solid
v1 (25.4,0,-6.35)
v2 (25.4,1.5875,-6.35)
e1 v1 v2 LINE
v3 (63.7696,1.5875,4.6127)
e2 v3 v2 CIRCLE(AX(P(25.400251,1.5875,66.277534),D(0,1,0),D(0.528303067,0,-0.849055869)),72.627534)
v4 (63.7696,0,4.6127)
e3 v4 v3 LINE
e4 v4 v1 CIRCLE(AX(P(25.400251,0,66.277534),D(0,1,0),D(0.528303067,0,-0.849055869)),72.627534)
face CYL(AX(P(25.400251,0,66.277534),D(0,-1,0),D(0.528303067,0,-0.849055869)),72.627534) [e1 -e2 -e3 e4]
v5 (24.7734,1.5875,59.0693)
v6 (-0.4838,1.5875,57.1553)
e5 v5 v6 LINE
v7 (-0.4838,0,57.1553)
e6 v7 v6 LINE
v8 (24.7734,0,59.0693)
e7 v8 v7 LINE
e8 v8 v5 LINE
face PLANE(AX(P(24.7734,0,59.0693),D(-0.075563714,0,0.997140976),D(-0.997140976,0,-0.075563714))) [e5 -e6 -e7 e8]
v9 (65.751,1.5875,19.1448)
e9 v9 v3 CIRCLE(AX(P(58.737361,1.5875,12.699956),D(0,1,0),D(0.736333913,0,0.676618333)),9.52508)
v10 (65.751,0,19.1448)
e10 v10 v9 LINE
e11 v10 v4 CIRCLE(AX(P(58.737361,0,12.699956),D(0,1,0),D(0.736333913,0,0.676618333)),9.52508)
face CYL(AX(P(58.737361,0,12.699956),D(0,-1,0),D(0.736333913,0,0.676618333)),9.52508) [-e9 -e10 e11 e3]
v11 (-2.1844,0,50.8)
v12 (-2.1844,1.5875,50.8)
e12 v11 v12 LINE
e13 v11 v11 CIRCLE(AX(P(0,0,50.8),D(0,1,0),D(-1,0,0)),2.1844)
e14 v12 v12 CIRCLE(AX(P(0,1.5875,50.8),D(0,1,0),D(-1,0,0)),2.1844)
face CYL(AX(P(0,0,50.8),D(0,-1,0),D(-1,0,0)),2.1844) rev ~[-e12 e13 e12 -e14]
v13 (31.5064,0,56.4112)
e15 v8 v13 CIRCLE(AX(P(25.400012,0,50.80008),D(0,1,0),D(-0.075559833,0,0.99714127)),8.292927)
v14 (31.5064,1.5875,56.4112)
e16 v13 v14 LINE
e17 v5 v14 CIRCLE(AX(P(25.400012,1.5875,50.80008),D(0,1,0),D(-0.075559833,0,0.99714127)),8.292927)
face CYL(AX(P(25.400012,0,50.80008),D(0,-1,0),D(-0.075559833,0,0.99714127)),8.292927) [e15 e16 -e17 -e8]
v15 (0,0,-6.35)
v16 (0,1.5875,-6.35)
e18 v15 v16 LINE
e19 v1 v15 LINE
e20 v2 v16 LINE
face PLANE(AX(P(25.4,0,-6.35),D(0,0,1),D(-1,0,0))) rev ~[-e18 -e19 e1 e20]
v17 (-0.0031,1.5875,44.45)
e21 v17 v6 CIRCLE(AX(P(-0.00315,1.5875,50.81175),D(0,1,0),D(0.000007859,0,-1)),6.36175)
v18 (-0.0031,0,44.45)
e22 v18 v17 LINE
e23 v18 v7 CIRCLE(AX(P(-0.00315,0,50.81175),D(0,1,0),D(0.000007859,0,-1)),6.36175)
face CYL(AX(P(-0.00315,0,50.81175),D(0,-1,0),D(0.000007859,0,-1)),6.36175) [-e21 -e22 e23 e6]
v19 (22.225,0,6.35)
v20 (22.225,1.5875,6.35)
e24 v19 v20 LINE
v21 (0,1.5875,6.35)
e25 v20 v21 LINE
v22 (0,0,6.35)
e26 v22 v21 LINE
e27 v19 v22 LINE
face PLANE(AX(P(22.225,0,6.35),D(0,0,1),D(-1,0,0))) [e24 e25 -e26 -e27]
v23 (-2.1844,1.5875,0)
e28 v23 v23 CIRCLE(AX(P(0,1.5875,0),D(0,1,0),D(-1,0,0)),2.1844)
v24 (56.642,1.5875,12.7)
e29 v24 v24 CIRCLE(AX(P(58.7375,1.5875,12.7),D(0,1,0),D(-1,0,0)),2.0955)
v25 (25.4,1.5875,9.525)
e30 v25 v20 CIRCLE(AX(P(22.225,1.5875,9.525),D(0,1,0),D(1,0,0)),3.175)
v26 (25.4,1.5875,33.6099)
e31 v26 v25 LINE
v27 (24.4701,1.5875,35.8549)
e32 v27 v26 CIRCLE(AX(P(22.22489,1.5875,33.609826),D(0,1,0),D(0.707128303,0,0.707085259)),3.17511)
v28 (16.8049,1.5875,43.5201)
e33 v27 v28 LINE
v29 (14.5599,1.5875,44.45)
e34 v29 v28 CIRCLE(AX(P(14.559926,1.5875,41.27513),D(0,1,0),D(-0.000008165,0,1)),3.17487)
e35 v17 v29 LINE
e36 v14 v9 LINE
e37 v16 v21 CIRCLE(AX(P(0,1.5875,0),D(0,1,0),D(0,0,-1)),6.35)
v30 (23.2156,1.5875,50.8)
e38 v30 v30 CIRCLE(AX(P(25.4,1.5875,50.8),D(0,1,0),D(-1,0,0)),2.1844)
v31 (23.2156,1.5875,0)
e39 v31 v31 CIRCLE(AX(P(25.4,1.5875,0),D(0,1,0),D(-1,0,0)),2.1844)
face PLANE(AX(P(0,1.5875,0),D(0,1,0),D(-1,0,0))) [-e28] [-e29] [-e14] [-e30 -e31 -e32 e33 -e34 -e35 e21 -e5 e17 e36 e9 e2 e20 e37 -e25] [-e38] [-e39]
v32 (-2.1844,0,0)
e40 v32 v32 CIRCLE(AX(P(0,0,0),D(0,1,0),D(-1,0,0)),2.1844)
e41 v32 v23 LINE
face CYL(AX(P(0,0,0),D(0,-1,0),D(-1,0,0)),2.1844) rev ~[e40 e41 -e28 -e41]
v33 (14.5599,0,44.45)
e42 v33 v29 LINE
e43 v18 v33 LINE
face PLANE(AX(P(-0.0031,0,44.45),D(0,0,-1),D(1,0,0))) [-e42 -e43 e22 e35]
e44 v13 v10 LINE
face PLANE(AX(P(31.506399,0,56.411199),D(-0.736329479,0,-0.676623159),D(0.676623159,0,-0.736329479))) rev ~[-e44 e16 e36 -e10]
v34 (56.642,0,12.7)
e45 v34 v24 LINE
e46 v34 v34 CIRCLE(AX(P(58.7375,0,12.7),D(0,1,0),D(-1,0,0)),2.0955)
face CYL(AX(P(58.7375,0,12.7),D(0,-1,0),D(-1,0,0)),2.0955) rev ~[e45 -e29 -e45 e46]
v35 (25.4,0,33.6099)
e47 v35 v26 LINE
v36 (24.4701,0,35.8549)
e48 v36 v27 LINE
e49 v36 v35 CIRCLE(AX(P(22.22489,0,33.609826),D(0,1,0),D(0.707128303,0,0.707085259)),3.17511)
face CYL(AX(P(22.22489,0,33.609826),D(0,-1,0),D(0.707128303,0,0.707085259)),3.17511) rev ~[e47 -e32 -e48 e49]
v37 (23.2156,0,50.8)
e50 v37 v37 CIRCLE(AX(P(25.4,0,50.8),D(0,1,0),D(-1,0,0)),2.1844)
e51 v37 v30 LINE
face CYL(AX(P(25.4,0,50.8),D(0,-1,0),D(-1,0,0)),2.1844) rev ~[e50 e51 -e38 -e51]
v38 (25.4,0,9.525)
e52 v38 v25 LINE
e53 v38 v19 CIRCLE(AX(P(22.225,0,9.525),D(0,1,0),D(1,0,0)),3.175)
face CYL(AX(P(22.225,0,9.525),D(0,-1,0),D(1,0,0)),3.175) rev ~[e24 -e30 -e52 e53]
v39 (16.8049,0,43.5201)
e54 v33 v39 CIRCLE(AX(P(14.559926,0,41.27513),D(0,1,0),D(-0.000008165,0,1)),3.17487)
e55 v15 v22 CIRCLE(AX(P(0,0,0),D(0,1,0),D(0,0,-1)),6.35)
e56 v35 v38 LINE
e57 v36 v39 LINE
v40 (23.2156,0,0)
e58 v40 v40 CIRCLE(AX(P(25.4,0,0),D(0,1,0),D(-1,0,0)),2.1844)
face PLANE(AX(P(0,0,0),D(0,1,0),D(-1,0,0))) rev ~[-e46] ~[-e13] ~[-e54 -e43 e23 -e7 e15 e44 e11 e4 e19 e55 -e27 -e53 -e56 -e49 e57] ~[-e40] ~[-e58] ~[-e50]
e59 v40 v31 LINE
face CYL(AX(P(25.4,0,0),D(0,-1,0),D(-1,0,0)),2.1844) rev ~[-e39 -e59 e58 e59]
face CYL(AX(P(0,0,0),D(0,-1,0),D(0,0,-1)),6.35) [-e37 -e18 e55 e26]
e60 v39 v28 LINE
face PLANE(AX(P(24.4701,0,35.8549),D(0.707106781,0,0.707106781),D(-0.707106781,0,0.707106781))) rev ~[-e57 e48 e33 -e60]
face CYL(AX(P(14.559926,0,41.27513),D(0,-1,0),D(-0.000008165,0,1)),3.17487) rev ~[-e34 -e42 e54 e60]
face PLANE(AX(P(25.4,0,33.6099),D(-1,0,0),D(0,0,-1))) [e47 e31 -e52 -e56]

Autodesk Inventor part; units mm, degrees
ref_plane "YZ Plane" through (0, 0, 0) normal (1, 0, 0) x (0, 1, 0)
ref_plane "XZ Plane" through (0, 0, 0) normal (0, 1, 0) x (-1, 0, 0)
ref_plane "XY Plane" through (0, 0, 0) normal (0, 0, 1) x (1, 0, 0)
sketch "main" plane through (0, 0, 0) normal (0, 0, 1) x (1, 0, 0)
  circle A0 centre (7.297, 24.2073) radius 2.1844
  arc A1 (32.7001, 17.8573) -> (32.7001, 30.5808) centre (32.7001, 24.219) ccw
  line L0 (8.227, 9.2622) -> (15.8921, 16.9273)
  arc A2 (18.1371, 17.8573) -> (15.8921, 16.9273) centre (18.1371, 14.6823) ccw
  line L1 (32.7001, 17.8573) -> (18.1371, 17.8573)
  circle A3 centre (32.697, 24.2073) radius 2.1844
  line L2 (7.9237, 32.4766) -> (33.1809, 30.5626)
  arc A4 (7.9237, 32.4766) -> (1.1906, 29.8185) centre (7.297, 24.2073) ccw
  circle A5 centre (7.297, -26.5927) radius 2.1844
  arc A6 (-33.054, -7.4479) -> (-31.0726, -21.98) centre (-26.0405, -13.8927) ccw
  line L3 (1.381, 30.0257) -> (-33.054, -7.4479)
  arc A7 (-31.0726, -21.98) -> (7.297, -32.9427) centre (7.297, 39.6854) ccw
  line L4 (7.297, -32.9427) -> (32.697, -32.9427)
  arc A8 (32.697, -32.9427) -> (32.697, -20.2427) centre (32.697, -26.5927) ccw
  circle A9 centre (-26.0405, -13.8927) radius 2.0955
  line L5 (7.297, 7.0171) -> (7.297, -17.0677)
  arc A10 (7.297, -17.0677) -> (10.472, -20.2427) centre (10.472, -17.0677) ccw
  line L6 (10.472, -20.2427) -> (32.697, -20.2427)
  circle A11 centre (32.697, -26.5927) radius 2.1844
  arc A12 (8.227, 9.2622) -> (7.297, 7.0171) centre (10.472, 7.0171) ccw
  point P0 (10.5963, 4.2161)
  point P1 (16.822, 17.8573)
  point P2 (7.297, 8.3323)
  point P3 (1.963, 30.5573)
  point P4 (7.297, 17.8573)
  dimension "d0" = 9.525
  dimension "d1" = 9.525
  dimension "d2" = 3.175
  dimension "d3" = 4.191
  dimension "d4" = 3.175
sketch "Sketch1" plane through (0, 0, 0) normal (0, 1, 0) x (-1, 0, 0)
  circle A0 centre (-25.4, 50.8) radius 2.1844
  arc A1 (0.0031, 44.45) -> (0.0031, 57.1735) centre (0.0031, 50.8118) ccw
  line L0 (-24.4701, 35.8549) -> (-16.8049, 43.5201)
  arc A2 (-14.5599, 44.45) -> (-16.8049, 43.5201) centre (-14.5599, 41.275) ccw
  line L1 (0.0031, 44.45) -> (-14.5599, 44.45)
  circle A3 centre (0, 50.8) radius 2.1844
  line L2 (-24.7734, 59.0693) -> (0.4838, 57.1553)
  arc A4 (-24.7734, 59.0693) -> (-31.5064, 56.4112) centre (-25.4, 50.8) ccw
  circle A5 centre (-25.4, 0) radius 2.1844
  arc A6 (-65.751, 19.1448) -> (-63.7696, 4.6127) centre (-58.7375, 12.7) ccw
  line L3 (-31.316, 56.6184) -> (-65.751, 19.1448)
  arc A7 (-63.7696, 4.6127) -> (-25.4, -6.35) centre (-25.4, 66.2781) ccw
  line L4 (-25.4, -6.35) -> (0, -6.35)
  arc A8 (0, -6.35) -> (0, 6.35) centre (0, 0) ccw
  circle A9 centre (-58.7375, 12.7) radius 2.0955
  line L5 (-25.4, 33.6099) -> (-25.4, 9.525)
  arc A10 (-25.4, 9.525) -> (-22.225, 6.35) centre (-22.225, 9.525) ccw
  line L6 (-22.225, 6.35) -> (0, 6.35)
  circle A11 centre (0, 0) radius 2.1844
  arc A12 (-24.4701, 35.8549) -> (-25.4, 33.6099) centre (-22.225, 33.6099) ccw
extrude "Extrusion1" add sketch "Sketch1" along normal blind 1.5875
equation "\"d1\" = d0"
properties part number "gusset" material "Acetal Resin, White"
